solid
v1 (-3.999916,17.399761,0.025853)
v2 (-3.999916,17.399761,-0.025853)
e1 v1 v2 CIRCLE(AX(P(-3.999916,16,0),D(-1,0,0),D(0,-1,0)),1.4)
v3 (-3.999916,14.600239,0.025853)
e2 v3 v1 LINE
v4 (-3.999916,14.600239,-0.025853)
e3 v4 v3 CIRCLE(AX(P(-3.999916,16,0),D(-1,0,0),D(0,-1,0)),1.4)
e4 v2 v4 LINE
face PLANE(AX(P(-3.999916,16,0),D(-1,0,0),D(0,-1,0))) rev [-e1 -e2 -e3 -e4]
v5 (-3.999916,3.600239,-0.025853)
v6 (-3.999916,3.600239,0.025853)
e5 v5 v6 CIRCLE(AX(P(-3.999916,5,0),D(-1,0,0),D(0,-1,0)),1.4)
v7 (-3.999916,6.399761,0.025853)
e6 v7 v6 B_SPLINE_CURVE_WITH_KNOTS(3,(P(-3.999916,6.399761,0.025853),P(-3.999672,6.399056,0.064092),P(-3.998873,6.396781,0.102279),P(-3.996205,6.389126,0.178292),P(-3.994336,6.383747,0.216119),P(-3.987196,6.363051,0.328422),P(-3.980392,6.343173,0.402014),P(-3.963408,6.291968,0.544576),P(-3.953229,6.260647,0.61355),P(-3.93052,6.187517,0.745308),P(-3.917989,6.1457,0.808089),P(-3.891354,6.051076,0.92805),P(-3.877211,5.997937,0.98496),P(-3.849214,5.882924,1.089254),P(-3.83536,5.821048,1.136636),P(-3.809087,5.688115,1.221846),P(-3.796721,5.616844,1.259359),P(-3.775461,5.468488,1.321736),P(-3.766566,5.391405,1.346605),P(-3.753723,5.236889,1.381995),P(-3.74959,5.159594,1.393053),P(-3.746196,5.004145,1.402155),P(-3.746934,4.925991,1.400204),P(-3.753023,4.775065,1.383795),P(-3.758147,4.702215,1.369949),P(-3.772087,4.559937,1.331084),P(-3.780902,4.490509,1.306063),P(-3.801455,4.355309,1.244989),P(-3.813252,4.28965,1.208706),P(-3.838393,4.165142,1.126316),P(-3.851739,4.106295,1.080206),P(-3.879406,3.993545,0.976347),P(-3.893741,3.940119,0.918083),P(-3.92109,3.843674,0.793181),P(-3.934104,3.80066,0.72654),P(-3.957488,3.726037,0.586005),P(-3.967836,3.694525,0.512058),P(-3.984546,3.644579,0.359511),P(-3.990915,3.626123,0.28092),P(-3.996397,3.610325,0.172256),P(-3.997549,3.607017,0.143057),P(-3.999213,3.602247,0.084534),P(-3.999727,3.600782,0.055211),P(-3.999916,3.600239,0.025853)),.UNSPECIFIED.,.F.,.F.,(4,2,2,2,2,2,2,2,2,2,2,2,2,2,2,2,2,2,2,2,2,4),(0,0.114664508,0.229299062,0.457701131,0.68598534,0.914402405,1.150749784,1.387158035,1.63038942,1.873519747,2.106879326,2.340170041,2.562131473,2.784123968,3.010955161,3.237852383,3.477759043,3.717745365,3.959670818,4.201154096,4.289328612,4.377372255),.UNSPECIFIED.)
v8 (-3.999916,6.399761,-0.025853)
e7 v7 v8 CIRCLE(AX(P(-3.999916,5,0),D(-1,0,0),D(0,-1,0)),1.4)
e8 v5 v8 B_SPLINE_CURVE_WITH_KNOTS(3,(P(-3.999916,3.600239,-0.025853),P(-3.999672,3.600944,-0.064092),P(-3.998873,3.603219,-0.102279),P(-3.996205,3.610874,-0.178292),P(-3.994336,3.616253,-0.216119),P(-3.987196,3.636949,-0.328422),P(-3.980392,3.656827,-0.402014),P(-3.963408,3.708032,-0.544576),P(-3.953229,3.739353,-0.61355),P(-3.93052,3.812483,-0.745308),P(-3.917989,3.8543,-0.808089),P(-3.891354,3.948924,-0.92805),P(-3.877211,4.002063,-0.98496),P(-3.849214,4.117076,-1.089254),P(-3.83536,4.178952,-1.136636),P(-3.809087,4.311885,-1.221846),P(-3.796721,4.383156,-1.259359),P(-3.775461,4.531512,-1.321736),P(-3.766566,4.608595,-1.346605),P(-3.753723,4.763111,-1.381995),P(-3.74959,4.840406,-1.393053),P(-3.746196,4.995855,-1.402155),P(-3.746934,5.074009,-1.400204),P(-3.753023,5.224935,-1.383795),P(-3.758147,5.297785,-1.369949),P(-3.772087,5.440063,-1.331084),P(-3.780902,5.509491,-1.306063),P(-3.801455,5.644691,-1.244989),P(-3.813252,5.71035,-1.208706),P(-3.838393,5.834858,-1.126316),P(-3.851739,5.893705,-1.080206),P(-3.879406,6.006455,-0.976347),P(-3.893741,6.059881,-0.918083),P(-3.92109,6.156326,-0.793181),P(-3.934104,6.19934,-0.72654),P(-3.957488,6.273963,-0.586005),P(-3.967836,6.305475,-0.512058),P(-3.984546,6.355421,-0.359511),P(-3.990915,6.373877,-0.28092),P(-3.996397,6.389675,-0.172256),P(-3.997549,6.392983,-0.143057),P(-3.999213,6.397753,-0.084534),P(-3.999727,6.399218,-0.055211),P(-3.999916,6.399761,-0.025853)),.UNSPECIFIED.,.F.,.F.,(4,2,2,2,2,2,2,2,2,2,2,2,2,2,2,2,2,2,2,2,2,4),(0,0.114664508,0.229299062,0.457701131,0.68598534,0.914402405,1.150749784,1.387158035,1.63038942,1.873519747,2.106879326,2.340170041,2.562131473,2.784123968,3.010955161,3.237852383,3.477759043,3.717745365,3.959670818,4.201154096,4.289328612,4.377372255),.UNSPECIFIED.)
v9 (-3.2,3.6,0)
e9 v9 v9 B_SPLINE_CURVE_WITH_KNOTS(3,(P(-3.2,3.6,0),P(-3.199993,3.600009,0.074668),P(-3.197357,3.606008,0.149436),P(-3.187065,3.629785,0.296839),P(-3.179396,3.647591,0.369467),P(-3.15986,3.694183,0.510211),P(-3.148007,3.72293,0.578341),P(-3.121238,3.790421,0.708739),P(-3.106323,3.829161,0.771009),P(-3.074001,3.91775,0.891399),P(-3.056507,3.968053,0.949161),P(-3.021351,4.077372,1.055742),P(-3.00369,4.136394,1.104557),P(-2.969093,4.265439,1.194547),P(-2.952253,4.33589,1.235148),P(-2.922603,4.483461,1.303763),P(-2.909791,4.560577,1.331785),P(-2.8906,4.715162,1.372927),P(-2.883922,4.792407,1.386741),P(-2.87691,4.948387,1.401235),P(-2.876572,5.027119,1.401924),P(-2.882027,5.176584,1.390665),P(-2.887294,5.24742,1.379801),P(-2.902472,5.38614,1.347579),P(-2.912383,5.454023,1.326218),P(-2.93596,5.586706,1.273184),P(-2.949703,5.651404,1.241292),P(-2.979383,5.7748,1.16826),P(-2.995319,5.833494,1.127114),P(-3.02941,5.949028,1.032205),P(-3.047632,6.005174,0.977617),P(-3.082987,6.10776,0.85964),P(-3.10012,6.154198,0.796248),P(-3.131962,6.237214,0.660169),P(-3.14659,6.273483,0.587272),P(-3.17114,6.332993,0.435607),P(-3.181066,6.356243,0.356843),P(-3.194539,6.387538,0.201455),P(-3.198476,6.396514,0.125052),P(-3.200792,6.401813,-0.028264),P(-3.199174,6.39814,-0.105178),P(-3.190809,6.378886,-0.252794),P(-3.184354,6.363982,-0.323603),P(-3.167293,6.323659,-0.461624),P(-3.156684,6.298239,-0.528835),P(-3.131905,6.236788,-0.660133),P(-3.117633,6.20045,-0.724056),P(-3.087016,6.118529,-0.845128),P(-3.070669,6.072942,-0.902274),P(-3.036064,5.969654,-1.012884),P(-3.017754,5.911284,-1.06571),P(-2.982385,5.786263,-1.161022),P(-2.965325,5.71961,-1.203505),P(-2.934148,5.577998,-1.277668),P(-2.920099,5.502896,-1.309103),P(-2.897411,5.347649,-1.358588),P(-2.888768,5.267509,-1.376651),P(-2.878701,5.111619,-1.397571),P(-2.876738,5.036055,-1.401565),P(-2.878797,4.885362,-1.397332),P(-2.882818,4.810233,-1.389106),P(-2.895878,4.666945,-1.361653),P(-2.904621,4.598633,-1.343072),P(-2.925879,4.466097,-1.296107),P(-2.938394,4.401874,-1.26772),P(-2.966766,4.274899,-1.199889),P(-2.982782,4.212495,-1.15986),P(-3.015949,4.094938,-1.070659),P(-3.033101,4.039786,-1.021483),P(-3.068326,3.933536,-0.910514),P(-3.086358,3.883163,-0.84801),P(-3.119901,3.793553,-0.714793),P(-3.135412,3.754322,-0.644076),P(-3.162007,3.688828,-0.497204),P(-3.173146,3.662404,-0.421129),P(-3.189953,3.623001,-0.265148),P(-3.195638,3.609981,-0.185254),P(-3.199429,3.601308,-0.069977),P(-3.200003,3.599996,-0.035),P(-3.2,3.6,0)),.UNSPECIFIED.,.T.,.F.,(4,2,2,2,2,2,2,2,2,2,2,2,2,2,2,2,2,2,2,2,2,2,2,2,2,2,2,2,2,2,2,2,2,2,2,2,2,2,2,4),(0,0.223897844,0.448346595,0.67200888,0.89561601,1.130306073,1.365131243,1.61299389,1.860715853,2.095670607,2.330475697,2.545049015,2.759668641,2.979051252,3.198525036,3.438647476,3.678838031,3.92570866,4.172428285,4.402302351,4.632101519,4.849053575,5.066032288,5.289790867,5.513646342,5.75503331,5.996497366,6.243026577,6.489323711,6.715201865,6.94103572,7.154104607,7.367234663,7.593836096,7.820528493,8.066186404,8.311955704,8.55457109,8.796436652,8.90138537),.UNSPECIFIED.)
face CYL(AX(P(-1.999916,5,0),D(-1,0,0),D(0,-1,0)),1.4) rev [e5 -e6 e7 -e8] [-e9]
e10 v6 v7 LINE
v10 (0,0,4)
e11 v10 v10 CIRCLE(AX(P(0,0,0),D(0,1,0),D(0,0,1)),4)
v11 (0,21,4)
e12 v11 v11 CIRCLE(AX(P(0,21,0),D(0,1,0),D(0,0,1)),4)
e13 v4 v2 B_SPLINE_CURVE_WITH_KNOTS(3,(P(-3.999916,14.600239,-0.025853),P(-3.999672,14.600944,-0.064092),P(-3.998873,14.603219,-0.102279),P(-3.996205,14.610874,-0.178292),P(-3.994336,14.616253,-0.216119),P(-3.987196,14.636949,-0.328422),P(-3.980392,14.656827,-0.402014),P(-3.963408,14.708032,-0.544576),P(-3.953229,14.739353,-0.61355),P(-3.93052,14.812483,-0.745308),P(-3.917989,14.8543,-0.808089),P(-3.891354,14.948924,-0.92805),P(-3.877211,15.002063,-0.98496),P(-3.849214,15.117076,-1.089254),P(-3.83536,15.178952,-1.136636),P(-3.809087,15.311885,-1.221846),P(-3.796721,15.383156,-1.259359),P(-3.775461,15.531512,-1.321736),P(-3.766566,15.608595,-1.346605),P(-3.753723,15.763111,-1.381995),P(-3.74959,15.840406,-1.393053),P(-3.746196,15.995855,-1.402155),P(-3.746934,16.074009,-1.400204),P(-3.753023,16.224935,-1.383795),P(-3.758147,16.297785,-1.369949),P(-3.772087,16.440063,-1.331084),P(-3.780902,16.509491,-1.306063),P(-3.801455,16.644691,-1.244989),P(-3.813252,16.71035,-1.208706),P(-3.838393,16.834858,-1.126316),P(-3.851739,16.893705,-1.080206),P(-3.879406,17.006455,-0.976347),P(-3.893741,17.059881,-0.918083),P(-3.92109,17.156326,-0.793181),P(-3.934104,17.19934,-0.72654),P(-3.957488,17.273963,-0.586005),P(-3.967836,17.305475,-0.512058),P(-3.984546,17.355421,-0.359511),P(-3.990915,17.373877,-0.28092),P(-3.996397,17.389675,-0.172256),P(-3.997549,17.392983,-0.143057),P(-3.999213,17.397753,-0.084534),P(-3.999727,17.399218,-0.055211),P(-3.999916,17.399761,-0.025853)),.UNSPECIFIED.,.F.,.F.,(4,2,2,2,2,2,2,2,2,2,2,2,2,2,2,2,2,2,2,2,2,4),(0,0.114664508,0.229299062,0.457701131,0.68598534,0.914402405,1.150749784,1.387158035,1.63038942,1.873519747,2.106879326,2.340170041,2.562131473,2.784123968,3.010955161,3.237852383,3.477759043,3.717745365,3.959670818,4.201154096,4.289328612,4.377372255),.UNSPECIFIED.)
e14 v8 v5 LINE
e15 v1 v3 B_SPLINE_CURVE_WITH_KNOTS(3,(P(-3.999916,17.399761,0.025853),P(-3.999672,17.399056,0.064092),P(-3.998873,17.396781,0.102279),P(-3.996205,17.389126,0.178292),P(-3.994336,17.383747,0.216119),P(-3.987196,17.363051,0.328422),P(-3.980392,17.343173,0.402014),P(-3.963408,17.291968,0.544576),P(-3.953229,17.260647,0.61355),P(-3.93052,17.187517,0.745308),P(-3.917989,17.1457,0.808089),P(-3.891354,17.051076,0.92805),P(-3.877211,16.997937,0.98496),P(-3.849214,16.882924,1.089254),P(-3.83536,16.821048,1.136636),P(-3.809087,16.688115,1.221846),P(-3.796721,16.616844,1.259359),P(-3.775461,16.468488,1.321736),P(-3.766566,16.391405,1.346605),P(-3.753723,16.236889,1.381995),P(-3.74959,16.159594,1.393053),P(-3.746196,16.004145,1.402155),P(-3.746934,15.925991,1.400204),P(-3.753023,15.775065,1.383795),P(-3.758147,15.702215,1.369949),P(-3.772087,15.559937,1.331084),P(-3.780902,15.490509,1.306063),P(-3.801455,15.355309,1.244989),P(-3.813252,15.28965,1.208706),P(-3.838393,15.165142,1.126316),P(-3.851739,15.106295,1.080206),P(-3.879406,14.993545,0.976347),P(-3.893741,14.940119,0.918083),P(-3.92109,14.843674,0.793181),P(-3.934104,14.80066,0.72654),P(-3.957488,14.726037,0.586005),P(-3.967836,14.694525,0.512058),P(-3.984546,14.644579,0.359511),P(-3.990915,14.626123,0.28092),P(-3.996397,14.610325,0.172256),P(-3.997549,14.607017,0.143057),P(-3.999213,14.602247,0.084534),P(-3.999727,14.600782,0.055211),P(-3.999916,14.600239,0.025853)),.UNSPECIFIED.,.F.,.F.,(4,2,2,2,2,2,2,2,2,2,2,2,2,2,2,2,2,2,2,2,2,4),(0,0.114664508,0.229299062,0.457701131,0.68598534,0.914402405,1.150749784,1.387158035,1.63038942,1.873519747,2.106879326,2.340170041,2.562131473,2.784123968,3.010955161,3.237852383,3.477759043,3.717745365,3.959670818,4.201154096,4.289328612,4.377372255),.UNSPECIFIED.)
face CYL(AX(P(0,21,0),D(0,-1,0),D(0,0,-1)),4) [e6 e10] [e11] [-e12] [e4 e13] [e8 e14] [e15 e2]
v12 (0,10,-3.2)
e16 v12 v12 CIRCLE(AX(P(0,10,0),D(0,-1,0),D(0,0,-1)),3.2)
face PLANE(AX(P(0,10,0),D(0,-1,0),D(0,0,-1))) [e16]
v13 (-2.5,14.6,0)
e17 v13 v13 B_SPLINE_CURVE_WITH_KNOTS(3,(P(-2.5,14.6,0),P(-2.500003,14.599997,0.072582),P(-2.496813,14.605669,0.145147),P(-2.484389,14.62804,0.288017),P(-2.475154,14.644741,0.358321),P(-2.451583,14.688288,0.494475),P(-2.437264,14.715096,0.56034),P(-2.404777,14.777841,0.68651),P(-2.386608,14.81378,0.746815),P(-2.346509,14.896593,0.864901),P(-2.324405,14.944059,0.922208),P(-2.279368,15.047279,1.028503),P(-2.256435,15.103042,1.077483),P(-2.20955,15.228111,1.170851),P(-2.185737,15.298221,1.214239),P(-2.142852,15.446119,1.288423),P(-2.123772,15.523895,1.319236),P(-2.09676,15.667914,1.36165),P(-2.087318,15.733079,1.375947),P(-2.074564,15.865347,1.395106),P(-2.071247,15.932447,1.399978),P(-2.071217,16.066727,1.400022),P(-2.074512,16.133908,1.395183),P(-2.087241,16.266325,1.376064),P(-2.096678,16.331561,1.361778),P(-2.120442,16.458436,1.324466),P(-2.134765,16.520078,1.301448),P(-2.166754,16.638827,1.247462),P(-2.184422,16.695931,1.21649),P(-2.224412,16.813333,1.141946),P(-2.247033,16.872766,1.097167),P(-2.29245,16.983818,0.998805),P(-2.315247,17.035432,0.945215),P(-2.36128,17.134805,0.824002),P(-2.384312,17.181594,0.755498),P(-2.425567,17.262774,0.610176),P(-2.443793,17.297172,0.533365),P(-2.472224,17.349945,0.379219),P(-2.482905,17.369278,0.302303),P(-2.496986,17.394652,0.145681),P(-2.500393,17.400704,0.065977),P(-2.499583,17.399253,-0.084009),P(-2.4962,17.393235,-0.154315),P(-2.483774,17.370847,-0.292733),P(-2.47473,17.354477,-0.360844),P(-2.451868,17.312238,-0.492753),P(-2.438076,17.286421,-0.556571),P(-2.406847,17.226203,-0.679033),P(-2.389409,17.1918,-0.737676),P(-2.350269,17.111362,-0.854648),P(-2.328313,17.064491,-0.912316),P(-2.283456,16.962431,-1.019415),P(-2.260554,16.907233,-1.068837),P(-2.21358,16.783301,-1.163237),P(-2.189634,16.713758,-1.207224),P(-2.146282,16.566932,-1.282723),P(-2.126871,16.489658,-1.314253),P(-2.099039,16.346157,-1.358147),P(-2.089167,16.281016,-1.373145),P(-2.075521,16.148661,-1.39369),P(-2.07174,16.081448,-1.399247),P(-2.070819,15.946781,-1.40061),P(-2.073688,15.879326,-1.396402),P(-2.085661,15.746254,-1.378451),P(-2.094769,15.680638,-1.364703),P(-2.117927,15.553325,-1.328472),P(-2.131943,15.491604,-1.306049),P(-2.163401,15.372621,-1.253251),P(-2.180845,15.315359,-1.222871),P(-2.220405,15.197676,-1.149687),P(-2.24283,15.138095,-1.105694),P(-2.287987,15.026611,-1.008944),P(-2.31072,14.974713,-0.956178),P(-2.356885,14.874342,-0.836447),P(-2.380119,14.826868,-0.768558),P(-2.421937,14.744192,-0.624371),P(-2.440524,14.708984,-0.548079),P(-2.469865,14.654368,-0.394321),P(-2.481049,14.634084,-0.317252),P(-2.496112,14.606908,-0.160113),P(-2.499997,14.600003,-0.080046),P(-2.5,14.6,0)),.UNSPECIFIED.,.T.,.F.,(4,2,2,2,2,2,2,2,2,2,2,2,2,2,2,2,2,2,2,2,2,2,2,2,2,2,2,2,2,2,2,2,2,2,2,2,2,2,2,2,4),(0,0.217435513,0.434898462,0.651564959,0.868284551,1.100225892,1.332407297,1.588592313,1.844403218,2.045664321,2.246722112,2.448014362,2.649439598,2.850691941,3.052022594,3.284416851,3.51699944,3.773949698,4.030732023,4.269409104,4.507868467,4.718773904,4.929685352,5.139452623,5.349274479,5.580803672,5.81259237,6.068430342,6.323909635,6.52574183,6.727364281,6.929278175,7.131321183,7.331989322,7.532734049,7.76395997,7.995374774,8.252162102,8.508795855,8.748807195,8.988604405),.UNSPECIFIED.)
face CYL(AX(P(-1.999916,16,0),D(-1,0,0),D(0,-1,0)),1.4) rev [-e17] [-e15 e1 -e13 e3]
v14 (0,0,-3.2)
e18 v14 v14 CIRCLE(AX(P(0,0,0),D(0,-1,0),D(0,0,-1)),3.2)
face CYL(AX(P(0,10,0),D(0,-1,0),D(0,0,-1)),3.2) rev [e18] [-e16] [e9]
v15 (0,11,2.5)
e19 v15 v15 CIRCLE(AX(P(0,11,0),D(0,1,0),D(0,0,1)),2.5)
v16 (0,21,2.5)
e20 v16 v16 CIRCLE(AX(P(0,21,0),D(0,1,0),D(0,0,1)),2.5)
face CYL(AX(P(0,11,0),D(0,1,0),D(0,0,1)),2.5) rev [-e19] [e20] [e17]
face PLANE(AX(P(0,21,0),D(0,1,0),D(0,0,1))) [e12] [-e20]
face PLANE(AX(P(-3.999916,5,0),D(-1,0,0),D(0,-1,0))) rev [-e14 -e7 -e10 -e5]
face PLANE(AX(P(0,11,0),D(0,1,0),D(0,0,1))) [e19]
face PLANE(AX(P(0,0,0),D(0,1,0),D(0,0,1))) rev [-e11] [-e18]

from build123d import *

# Parameters (mm, degrees)
SKETCH1_R           = 4
BOSS_EXTRUDE1_DEPTH = 21
SKETCH2_R           = 3.2
CUT_EXTRUDE1_DEPTH  = 10
SKETCH3_R           = 2.5
CUT_EXTRUDE3_DEPTH  = 10


with BuildPart() as part:
    # Sketch1 → Boss-Extrude1 (new body)
    with BuildSketch(Plane(origin=(0, 0, 0), x_dir=(1, 0, 0), z_dir=(0, 1, 0))):
        with Locations(Location((0, 0, 0), (0, 0, 90))):
            Circle(SKETCH1_R)
    extrude(amount=BOSS_EXTRUDE1_DEPTH)

    # Sketch2 → Cut-Extrude1 (cut)
    with BuildSketch(Plane.XZ):
        with Locations(Location((0, 0, 0), (0, 0, 270))):
            Circle(SKETCH2_R)
    extrude(amount=-CUT_EXTRUDE1_DEPTH, mode=Mode.SUBTRACT)

    # Sketch3 → Cut-Extrude3 (cut)
    with BuildSketch(Plane(origin=(0, 21, 0), x_dir=(1, 0, 0), z_dir=(0, 1, 0))):
        with Locations(Location((0, 0, 0), (0, 0, 270))):
            Circle(SKETCH3_R)
    extrude(amount=-CUT_EXTRUDE3_DEPTH, mode=Mode.SUBTRACT)

    # Cut-Extrude5: read off the stored shape, not the designer's step
    # Cut-Extrude5: loft between two sections, ruled curve by curve
    cut_extrude5_from = [
        Edge.make_three_point_arc((-2.07101841, 14.6, 0), (-2.07101841, 16, 1.4), (-2.07101841, 17.4, 0)),
        Edge.make_three_point_arc((-2.07101841, 17.4, 0), (-2.07101841, 16, -1.4), (-2.07101841, 14.6, 0)),
    ]
    cut_extrude5_to = [
        Edge.make_three_point_arc((-3.999916451, 14.6, 0), (-3.999916451, 16, 1.4), (-3.999916451, 17.4, 0)),
        Edge.make_three_point_arc((-3.999916451, 17.4, 0), (-3.999916451, 16, -1.4), (-3.999916451, 14.6, 0)),
    ]
    cut_extrude5 = Solid(Shell([*[Face.make_surface_from_curves(cut_extrude5_from[k], cut_extrude5_to[k]) for k in range(2)], Face(Wire(cut_extrude5_from)), Face(Wire(cut_extrude5_to))]))
    add(cut_extrude5, mode=Mode.SUBTRACT)

    # Cut-Extrude5 2: loft between two sections, ruled curve by curve
    cut_extrude5_2_from = [
        Edge.make_three_point_arc((-2.877351837, 3.6, 0), (-2.877351837, 5, 1.4), (-2.877351837, 6.4, 0)),
        Edge.make_three_point_arc((-2.877351837, 6.4, 0), (-2.877351837, 5, -1.4), (-2.877351837, 3.6, 0)),
    ]
    cut_extrude5_2_to = [
        Edge.make_three_point_arc((-3.999916451, 3.6, 0), (-3.999916451, 5, 1.4), (-3.999916451, 6.4, 0)),
        Edge.make_three_point_arc((-3.999916451, 6.4, 0), (-3.999916451, 5, -1.4), (-3.999916451, 3.6, 0)),
    ]
    cut_extrude5_2 = Solid(Shell([*[Face.make_surface_from_curves(cut_extrude5_2_from[k], cut_extrude5_2_to[k]) for k in range(2)], Face(Wire(cut_extrude5_2_from)), Face(Wire(cut_extrude5_2_to))]))
    add(cut_extrude5_2, mode=Mode.SUBTRACT)


solid = part.part
